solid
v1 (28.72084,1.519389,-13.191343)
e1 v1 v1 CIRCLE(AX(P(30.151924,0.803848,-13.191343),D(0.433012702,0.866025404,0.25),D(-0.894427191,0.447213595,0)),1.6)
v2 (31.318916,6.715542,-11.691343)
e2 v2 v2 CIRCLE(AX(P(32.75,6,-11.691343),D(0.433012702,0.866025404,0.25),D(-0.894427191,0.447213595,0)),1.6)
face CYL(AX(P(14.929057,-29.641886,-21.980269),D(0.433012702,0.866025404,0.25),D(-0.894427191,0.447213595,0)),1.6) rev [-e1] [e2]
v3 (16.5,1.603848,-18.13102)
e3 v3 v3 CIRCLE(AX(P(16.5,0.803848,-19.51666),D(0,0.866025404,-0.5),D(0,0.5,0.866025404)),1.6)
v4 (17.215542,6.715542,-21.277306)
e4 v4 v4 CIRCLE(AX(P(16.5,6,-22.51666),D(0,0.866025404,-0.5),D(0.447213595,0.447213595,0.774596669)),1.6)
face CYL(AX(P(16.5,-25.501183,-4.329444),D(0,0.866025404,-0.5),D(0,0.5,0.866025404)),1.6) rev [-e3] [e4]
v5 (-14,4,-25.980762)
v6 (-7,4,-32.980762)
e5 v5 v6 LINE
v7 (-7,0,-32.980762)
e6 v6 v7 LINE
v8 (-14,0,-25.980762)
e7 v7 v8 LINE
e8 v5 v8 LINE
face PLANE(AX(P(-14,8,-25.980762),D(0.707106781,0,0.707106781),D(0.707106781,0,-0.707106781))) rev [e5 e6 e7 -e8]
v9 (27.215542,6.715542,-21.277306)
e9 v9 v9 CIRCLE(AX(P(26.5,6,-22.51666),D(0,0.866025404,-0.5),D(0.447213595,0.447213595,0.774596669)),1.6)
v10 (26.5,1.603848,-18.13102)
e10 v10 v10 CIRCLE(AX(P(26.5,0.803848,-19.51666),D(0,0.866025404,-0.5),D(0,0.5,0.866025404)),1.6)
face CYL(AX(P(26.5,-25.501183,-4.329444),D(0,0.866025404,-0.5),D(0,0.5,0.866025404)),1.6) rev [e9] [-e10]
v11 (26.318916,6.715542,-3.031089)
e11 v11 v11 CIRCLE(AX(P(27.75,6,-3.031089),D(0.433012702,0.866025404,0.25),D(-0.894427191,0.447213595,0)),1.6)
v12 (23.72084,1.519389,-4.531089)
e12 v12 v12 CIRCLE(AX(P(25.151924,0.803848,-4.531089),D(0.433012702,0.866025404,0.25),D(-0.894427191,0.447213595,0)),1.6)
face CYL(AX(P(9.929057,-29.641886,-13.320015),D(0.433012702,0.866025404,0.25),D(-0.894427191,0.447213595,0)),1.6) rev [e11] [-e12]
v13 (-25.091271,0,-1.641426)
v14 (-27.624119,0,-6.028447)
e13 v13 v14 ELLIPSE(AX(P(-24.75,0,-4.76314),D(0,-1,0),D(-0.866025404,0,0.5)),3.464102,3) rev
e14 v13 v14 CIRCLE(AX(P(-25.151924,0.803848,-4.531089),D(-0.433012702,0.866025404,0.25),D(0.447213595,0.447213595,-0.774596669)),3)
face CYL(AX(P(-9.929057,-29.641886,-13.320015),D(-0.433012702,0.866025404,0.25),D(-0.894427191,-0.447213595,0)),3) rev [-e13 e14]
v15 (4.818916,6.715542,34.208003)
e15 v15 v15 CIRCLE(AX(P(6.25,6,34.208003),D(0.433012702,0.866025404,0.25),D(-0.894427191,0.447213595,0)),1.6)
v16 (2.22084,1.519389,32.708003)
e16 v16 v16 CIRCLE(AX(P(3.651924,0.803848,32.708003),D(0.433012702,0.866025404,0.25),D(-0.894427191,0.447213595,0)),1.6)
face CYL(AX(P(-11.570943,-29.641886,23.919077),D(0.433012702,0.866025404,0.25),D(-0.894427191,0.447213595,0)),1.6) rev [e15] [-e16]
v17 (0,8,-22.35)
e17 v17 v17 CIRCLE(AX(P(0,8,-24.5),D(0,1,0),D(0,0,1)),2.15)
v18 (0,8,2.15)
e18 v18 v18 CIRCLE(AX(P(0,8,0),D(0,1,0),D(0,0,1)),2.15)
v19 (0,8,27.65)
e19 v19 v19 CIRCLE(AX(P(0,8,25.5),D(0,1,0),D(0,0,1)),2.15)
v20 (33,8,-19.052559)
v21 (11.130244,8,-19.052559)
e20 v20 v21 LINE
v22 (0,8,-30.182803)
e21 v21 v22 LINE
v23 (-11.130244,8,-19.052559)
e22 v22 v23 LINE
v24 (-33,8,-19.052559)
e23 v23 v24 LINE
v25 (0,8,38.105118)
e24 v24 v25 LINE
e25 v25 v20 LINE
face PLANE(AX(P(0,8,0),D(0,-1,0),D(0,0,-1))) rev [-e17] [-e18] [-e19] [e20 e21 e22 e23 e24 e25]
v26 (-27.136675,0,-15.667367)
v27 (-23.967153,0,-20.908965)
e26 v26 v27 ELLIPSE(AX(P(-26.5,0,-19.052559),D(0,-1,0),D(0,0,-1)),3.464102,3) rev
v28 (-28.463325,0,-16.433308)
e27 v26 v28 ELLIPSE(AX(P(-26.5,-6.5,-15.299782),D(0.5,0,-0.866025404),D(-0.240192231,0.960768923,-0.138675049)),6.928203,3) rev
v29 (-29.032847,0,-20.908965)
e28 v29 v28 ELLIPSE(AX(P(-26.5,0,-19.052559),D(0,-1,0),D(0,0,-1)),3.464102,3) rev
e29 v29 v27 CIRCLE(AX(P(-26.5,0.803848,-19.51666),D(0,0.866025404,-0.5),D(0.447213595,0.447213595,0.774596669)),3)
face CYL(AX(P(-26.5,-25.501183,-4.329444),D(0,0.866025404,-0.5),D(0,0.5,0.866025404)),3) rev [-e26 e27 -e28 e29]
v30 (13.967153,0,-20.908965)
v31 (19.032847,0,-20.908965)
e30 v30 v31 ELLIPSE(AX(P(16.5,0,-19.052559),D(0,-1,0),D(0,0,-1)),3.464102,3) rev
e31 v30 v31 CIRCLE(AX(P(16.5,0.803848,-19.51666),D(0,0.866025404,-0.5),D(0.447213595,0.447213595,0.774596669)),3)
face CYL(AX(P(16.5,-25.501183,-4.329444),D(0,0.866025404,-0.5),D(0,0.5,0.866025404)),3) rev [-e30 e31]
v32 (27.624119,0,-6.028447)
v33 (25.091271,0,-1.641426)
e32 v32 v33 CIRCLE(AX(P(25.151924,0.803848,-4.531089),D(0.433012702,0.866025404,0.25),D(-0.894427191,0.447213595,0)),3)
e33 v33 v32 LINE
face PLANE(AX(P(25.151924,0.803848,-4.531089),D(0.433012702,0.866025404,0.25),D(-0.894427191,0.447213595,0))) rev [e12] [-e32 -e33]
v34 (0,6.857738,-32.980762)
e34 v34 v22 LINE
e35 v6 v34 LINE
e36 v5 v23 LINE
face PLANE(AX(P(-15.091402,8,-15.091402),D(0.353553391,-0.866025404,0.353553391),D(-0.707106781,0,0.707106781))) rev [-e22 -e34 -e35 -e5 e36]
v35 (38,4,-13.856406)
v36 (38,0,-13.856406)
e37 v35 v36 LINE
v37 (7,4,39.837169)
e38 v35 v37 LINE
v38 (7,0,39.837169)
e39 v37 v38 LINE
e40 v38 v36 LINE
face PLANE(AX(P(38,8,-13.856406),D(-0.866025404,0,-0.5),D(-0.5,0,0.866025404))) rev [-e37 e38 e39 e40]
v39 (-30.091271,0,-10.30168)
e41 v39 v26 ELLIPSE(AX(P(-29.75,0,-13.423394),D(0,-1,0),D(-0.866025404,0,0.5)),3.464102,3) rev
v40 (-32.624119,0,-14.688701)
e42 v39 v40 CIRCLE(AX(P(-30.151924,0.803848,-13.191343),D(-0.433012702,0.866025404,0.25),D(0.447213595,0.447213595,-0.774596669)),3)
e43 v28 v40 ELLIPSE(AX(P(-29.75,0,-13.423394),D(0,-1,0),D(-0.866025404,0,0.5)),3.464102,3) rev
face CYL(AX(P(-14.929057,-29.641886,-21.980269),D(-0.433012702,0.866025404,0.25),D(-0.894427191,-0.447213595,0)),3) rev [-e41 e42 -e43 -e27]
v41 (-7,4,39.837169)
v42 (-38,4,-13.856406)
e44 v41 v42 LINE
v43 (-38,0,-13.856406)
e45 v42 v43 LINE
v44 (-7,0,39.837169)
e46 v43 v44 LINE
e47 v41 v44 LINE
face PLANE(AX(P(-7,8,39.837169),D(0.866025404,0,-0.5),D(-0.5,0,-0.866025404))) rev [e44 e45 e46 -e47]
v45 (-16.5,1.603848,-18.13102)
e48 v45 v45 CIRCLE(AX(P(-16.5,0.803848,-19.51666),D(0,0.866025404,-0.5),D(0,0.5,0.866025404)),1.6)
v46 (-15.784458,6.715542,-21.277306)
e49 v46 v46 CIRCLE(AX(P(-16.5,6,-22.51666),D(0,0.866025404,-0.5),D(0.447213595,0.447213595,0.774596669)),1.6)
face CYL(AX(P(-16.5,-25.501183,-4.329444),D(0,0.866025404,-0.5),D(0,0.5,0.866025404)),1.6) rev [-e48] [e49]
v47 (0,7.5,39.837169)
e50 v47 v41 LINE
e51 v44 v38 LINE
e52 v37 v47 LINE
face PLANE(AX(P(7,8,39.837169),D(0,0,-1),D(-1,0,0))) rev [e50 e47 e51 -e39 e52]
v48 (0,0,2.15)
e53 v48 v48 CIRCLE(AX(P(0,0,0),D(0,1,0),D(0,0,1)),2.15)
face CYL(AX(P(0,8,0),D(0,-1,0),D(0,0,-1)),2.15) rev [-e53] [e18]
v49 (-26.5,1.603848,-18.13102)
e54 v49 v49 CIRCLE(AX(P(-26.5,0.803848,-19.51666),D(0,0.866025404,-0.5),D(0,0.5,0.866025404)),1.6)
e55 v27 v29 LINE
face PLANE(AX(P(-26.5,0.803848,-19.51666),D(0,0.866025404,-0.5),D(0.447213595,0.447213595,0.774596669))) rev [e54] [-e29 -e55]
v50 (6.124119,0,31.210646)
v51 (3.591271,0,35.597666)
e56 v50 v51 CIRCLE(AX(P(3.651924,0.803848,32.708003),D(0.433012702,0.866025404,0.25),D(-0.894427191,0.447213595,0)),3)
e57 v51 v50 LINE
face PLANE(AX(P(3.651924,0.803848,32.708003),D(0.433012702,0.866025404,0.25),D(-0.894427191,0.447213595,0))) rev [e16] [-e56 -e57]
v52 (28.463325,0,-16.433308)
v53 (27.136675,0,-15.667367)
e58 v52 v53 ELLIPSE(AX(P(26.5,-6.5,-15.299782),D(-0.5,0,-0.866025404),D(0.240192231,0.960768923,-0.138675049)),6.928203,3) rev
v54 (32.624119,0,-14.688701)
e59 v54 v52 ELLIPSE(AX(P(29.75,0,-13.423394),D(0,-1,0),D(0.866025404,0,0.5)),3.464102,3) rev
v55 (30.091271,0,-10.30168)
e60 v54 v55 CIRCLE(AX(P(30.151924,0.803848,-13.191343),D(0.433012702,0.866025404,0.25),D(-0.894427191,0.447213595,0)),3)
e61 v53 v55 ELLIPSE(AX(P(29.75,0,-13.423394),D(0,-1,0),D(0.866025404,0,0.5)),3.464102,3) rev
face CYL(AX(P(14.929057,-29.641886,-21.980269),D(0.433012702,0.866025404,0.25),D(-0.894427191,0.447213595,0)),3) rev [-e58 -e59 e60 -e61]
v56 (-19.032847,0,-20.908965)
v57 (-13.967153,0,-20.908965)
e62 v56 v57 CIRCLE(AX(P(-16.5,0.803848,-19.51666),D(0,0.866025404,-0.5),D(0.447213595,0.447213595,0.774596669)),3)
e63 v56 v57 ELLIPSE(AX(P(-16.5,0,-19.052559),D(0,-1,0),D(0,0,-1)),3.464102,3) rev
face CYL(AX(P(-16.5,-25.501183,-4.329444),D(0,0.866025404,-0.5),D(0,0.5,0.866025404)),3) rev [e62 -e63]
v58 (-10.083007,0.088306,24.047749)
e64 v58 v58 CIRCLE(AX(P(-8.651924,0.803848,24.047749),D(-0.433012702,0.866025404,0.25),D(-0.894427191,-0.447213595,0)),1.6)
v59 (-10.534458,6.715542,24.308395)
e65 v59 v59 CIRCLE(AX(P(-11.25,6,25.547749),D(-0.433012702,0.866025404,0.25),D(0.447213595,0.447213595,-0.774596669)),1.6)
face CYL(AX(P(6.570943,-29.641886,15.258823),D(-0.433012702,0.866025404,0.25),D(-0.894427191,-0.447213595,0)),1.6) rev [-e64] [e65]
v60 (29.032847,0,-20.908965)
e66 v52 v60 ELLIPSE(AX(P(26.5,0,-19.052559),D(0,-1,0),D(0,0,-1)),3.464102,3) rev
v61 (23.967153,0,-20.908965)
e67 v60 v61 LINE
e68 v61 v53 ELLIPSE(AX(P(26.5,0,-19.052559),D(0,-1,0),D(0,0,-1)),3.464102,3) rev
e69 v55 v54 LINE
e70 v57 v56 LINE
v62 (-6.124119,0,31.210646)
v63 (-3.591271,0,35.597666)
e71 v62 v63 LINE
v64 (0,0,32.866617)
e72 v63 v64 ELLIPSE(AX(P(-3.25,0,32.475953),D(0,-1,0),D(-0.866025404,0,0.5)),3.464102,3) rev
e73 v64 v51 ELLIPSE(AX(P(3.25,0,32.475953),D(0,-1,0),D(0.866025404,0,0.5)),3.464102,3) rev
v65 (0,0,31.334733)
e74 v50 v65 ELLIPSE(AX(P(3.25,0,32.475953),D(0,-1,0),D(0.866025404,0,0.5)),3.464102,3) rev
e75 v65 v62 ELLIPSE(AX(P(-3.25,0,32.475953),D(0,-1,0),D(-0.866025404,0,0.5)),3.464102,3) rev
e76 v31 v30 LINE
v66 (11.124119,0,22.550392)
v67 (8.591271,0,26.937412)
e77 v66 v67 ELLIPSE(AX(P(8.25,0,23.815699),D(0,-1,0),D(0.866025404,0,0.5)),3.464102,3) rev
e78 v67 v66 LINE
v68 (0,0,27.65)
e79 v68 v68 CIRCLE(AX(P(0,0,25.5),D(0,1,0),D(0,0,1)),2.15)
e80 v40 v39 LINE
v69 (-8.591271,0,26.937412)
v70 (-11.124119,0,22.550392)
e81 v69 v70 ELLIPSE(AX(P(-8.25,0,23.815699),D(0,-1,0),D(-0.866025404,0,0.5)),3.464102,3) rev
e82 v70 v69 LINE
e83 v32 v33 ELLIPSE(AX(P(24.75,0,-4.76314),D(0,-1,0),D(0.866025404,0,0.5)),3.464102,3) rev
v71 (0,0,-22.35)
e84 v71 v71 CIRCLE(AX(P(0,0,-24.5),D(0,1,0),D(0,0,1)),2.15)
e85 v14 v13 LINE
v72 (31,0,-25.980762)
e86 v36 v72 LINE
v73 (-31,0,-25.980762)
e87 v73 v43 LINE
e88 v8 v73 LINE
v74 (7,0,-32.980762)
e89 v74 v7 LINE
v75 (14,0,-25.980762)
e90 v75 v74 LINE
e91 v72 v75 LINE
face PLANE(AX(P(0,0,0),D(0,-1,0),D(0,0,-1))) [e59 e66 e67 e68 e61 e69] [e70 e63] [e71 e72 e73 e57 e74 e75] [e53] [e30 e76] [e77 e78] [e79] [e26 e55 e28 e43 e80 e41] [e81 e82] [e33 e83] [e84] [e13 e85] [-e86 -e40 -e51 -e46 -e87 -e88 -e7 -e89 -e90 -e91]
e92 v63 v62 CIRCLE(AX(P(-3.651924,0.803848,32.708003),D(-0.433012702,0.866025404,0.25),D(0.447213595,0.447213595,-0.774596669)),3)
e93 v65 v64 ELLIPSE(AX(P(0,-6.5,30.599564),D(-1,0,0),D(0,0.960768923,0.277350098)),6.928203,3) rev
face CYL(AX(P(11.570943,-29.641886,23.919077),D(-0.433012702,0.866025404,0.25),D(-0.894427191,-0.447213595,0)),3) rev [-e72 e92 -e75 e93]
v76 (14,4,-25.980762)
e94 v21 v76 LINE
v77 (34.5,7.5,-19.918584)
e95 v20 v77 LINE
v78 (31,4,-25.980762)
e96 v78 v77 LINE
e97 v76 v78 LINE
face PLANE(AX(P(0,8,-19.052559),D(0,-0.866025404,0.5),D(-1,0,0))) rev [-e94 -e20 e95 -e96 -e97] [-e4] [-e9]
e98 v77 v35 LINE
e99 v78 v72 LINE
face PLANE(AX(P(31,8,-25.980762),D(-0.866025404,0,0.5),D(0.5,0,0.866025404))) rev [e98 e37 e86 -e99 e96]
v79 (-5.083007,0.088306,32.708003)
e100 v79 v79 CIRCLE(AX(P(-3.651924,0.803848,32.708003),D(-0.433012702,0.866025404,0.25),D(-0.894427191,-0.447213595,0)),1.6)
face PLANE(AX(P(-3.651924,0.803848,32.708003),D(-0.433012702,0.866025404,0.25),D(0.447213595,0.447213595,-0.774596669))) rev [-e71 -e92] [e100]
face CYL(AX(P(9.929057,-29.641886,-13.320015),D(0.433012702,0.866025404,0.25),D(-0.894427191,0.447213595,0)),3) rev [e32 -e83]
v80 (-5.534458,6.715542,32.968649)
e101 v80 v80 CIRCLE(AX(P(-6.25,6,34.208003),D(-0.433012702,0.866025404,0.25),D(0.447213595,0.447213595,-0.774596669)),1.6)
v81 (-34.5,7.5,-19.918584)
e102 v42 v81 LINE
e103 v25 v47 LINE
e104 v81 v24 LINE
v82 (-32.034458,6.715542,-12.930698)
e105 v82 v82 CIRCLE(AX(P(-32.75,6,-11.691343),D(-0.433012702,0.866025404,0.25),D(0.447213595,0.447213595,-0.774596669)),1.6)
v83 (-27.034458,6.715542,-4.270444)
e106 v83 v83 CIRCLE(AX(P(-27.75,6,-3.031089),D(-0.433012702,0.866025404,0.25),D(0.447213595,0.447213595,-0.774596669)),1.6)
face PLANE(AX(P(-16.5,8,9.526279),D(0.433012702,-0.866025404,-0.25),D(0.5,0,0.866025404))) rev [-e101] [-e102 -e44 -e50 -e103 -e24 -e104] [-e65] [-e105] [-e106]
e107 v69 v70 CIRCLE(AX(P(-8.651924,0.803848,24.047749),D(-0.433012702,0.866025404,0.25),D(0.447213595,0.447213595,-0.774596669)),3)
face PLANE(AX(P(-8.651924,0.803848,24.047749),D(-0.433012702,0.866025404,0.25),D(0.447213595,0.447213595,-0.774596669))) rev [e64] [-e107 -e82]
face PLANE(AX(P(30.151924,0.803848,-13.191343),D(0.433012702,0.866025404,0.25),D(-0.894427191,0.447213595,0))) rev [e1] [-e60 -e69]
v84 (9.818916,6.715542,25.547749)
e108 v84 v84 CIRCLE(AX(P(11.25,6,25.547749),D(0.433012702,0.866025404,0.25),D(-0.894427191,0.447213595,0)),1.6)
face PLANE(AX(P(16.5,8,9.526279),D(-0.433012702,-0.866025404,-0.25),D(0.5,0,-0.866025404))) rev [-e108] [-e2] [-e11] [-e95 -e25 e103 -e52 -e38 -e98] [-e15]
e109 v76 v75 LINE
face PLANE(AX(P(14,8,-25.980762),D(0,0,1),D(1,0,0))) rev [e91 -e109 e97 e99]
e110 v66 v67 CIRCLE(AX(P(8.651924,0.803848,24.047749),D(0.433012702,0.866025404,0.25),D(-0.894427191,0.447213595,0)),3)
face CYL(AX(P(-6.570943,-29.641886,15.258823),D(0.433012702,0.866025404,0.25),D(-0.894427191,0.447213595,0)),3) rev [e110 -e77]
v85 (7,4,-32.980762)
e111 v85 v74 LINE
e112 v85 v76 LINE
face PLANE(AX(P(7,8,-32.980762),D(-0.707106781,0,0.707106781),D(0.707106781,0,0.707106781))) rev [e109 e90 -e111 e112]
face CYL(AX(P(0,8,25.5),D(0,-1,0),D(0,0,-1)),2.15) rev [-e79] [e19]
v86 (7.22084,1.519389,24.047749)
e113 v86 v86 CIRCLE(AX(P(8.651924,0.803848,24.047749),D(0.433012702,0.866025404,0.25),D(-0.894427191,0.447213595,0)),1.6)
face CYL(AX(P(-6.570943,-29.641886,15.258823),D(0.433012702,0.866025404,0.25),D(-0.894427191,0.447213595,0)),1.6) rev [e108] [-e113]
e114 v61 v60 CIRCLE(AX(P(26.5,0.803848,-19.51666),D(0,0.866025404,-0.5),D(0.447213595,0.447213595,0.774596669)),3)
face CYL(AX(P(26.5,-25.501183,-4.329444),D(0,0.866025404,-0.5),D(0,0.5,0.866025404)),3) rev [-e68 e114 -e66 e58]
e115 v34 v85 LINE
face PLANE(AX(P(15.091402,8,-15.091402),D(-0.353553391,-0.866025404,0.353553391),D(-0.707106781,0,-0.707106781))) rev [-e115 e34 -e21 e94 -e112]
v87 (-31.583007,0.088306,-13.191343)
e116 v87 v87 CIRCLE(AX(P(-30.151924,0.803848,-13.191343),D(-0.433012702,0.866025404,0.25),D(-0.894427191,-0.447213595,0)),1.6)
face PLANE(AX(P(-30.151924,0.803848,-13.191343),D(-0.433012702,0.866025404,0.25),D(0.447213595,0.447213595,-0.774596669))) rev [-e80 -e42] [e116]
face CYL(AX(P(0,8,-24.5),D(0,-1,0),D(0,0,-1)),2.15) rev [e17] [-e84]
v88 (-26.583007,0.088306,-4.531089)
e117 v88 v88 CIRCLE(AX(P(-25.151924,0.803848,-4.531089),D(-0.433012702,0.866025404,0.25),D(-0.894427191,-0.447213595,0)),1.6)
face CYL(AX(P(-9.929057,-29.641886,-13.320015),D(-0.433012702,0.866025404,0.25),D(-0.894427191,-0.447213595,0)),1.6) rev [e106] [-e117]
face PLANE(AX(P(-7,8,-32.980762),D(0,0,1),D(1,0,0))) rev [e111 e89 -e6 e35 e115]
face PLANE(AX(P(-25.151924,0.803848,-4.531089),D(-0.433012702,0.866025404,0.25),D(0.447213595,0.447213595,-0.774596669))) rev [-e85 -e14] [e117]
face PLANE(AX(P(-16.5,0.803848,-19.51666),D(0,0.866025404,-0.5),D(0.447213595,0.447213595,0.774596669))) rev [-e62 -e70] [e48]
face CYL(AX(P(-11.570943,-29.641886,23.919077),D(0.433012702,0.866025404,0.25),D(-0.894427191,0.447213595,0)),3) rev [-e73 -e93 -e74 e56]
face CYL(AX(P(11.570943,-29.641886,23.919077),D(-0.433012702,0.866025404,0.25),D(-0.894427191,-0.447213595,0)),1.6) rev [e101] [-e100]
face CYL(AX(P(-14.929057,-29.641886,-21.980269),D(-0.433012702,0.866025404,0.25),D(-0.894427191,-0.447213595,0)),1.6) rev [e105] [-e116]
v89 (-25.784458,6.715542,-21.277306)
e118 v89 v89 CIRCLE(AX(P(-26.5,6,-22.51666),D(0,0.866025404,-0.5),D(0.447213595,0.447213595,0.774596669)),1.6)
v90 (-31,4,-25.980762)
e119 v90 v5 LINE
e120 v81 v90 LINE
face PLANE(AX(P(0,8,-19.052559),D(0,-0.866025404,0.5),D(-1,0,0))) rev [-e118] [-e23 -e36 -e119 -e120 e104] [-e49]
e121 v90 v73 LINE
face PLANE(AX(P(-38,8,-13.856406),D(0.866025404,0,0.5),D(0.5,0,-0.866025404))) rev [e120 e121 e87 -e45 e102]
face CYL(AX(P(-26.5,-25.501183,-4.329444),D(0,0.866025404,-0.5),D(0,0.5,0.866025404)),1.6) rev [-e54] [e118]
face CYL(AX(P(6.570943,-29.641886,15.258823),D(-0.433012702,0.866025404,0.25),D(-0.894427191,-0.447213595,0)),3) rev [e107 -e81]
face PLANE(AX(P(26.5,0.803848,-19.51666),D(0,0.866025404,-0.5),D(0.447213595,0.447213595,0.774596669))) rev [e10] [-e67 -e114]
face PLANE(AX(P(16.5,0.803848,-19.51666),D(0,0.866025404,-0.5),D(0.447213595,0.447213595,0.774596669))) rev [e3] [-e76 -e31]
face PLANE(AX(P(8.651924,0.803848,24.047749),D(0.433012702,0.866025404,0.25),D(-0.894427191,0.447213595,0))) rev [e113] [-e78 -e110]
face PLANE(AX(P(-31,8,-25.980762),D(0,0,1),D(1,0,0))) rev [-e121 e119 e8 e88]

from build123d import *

# Parameters (mm, degrees)
SKETCH1_R           = 2.15
BOSS_EXTRUDE1_DEPTH = 8
CHAMFER1_SIZE       = 4
CHAMFER1_SIZE_2     = 6.92820323
CUT_EXTRUDE1_REACH  = 62.128
SKETCH2_R           = 1.6
CUT_EXTRUDE2_REACH  = 68.128
CUT_EXTRUDE2_START  = -6
SKETCH3_R           = 3
CIRPATTERN1_COUNT   = 3


with BuildPart() as part:
    # Sketch1 → Boss-Extrude1 (new body)
    with BuildSketch(Plane(origin=(0, 0, 0), x_dir=(1, 0, 0), z_dir=(0, 1, 0))):
        Polygon((-31, 25.980762114), (-14, 25.980762114), (-7, 32.980762114), (7, 32.980762114), (14, 25.980762114), (31, 25.980762114), (38, 13.856406461), (7, -39.837168574), (-7, -39.837168574), (-38, 13.856406461), align=None)
        with Locations(Location((0, 24.5, 0), (0, 0, 270))):
            Circle(SKETCH1_R, mode=Mode.SUBTRACT)
        with Locations(Location((0, -25.5, 0), (0, 0, 270))):
            Circle(SKETCH1_R, mode=Mode.SUBTRACT)
        with Locations(Location((0, 0, 0), (0, 0, 270))):
            Circle(SKETCH1_R, mode=Mode.SUBTRACT)
    extrude(amount=BOSS_EXTRUDE1_DEPTH)

    # Chamfer1
    # the kernel refuses this chamfer: 6.92820323, 4 mm, written as the material it takes off along each edge
    with BuildSketch(Plane(origin=(46.961927941, 8, -29.378920988), x_dir=(0.05013755556391488, -0.9983227437537926, 0.028946931201335895), z_dir=(-0.49999999999999767, 0, 0.86602540378444)), Plane(origin=(1.961927941, 8, 55.359683102), x_dir=(-0.05013755556391399, -0.9983227437537926, 0.02894693120133537), z_dir=(-0.49999999999999756, 0, -0.8660254037844402))) as chamfer1_piece_1:
        Polygon((CHAMFER1_SIZE * 0.998322743754, -CHAMFER1_SIZE * 0.0578938624027), (-CHAMFER1_SIZE_2 * 0.057893862405, -CHAMFER1_SIZE_2 * 0.998322743793), (0, 0), align=None)
    extrude(amount=97.847711765, mode=Mode.SUBTRACT)
    with BuildSketch(Plane(origin=(-3.923855882, 8, -25.980762114), x_dir=(0, -0.9983227437537926, -0.05789386240267147), z_dir=(1, 0, 0))) as chamfer1_piece_2_section:
        Polygon((CHAMFER1_SIZE * 0.998322743754, -CHAMFER1_SIZE * 0.0578938624027), (-CHAMFER1_SIZE_2 * 0.057893862405, -CHAMFER1_SIZE_2 * 0.998322743793), (0, 0), align=None)
    chamfer1_piece_2 = extrude(amount=52.847711765, mode=Mode.PRIVATE)
    chamfer1_piece_2 = split(chamfer1_piece_2, bisect_by=Plane(origin=(24.400878633, 6.686948716, -15.57988348), z_dir=(0.7071067811865477, 0, -0.7071067811865475)), keep=Keep.TOP, mode=Mode.PRIVATE)
    add(chamfer1_piece_2, mode=Mode.SUBTRACT)
    with BuildSketch(Plane(origin=(-5.674080039, 8, -45.654842153), x_dir=(0.04093714269400996, -0.9983227437537926, -0.04093714269400995), z_dir=(0.7071067811865475, 0, 0.7071067811865477))) as chamfer1_piece_3_section:
        Polygon((CHAMFER1_SIZE * 0.998322743754, -CHAMFER1_SIZE * 0.0578938624027), (-CHAMFER1_SIZE_2 * 0.057893862405, -CHAMFER1_SIZE_2 * 0.998322743793), (0, 0), align=None)
    chamfer1_piece_3 = extrude(amount=45.747206701, mode=Mode.PRIVATE)
    chamfer1_piece_3 = split(chamfer1_piece_3, bisect_by=Plane(origin=(1.830005366, 6.678491599, -25.980762114), z_dir=(0, 0, -1)), keep=Keep.TOP, mode=Mode.PRIVATE)
    add(chamfer1_piece_3, mode=Mode.SUBTRACT)
    with BuildSketch(Plane(origin=(-26.674080039, 8, -13.306682074), x_dir=(-0.04093714269400995, -0.9983227437537926, -0.04093714269400996), z_dir=(0.7071067811865477, 0, -0.7071067811865474))) as chamfer1_piece_4_section:
        Polygon((CHAMFER1_SIZE * 0.998322743754, -CHAMFER1_SIZE * 0.0578938624027), (-CHAMFER1_SIZE_2 * 0.057893862405, -CHAMFER1_SIZE_2 * 0.998322743793), (0, 0), align=None)
    chamfer1_piece_4 = extrude(amount=45.747206701, mode=Mode.PRIVATE)
    chamfer1_piece_4 = split(chamfer1_piece_4, bisect_by=Plane(origin=(-1.830005366, 6.678491599, -25.980762114), z_dir=(0, 0, -1)), keep=Keep.TOP, mode=Mode.PRIVATE)
    add(chamfer1_piece_4, mode=Mode.SUBTRACT)
    with BuildSketch(Plane(origin=(-48.923855882, 8, -25.980762114), x_dir=(0, -0.9983227437537926, -0.05789386240267147), z_dir=(1, 0, 0))) as chamfer1_piece_5_section:
        Polygon((CHAMFER1_SIZE * 0.998322743754, -CHAMFER1_SIZE * 0.0578938624027), (-CHAMFER1_SIZE_2 * 0.057893862405, -CHAMFER1_SIZE_2 * 0.998322743793), (0, 0), align=None)
    chamfer1_piece_5 = extrude(amount=52.847711765, mode=Mode.PRIVATE)
    chamfer1_piece_5 = split(chamfer1_piece_5, bisect_by=Plane(origin=(-24.400878633, 6.686948716, -15.57988348), z_dir=(-0.7071067811865474, 0, -0.7071067811865477)), keep=Keep.TOP, mode=Mode.PRIVATE)
    add(chamfer1_piece_5, mode=Mode.SUBTRACT)
    with BuildSketch(Plane(origin=(-5.674080039, 8, -45.654842153), x_dir=(0.04093714269400996, -0.9983227437537926, -0.04093714269400995), z_dir=(0.7071067811865475, 0, 0.7071067811865477))) as chamfer1_piece_6a_section:
        Polygon((CHAMFER1_SIZE * 0.998322743754, -CHAMFER1_SIZE * 0.0578938624027), (-CHAMFER1_SIZE_2 * 0.057893862405, -CHAMFER1_SIZE_2 * 0.998322743793), (0, 0), align=None)
    chamfer1_piece_6a = extrude(amount=45.747206701, mode=Mode.PRIVATE)
    chamfer1_piece_6a = split(chamfer1_piece_6a, bisect_by=Plane(origin=(17.706766412, 6.766221652, -25.980762114), z_dir=(0, 0, 1)), keep=Keep.TOP, mode=Mode.PRIVATE)
    with BuildSketch(Plane(origin=(-3.923855882, 8, -25.980762114), x_dir=(0, -0.9983227437537926, -0.05789386240267147), z_dir=(1, 0, 0))) as chamfer1_piece_6b_section:
        Polygon((CHAMFER1_SIZE * 0.998322743754, -CHAMFER1_SIZE * 0.0578938624027), (-CHAMFER1_SIZE_2 * 0.057893862405, -CHAMFER1_SIZE_2 * 0.998322743793), (0, 0), align=None)
    chamfer1_piece_6b = extrude(amount=52.847711765, mode=Mode.PRIVATE)
    chamfer1_piece_6b = split(chamfer1_piece_6b, bisect_by=Plane(origin=(11.378920334, 6.766221652, -28.60184178), z_dir=(-0.7071067811865477, 0, 0.7071067811865475)), keep=Keep.TOP, mode=Mode.PRIVATE)
    chamfer1_piece_6 = chamfer1_piece_6a & chamfer1_piece_6b
    add(chamfer1_piece_6, mode=Mode.SUBTRACT)
    with BuildSketch(Plane(origin=(-48.923855882, 8, -25.980762114), x_dir=(0, -0.9983227437537926, -0.05789386240267147), z_dir=(1, 0, 0))) as chamfer1_piece_7a_section:
        Polygon((CHAMFER1_SIZE * 0.998322743754, -CHAMFER1_SIZE * 0.0578938624027), (-CHAMFER1_SIZE_2 * 0.057893862405, -CHAMFER1_SIZE_2 * 0.998322743793), (0, 0), align=None)
    chamfer1_piece_7a = extrude(amount=52.847711765, mode=Mode.PRIVATE)
    chamfer1_piece_7a = split(chamfer1_piece_7a, bisect_by=Plane(origin=(-11.378920334, 6.766221652, -28.60184178), z_dir=(0.7071067811865474, 0, 0.7071067811865477)), keep=Keep.TOP, mode=Mode.PRIVATE)
    with BuildSketch(Plane(origin=(-26.674080039, 8, -13.306682074), x_dir=(-0.04093714269400995, -0.9983227437537926, -0.04093714269400996), z_dir=(0.7071067811865477, 0, -0.7071067811865474))) as chamfer1_piece_7b_section:
        Polygon((CHAMFER1_SIZE * 0.998322743754, -CHAMFER1_SIZE * 0.0578938624027), (-CHAMFER1_SIZE_2 * 0.057893862405, -CHAMFER1_SIZE_2 * 0.998322743793), (0, 0), align=None)
    chamfer1_piece_7b = extrude(amount=45.747206701, mode=Mode.PRIVATE)
    chamfer1_piece_7b = split(chamfer1_piece_7b, bisect_by=Plane(origin=(-17.706766412, 6.766221652, -25.980762114), z_dir=(0, 0, 1)), keep=Keep.TOP, mode=Mode.PRIVATE)
    chamfer1_piece_7 = chamfer1_piece_7a & chamfer1_piece_7b
    add(chamfer1_piece_7, mode=Mode.SUBTRACT)

    # Cut-Extrude1: up to this plane
    cut_extrude1_end = Plane(origin=(0, 0, 0), z_dir=(0, -1, 0))
    # Sketch2 → Cut-Extrude1 (cut, up to the surface)
    with BuildSketch(Plane(origin=(7.125, 14.25, 4.113620668), x_dir=(0.9013878188659966, -0.41602514716892336, -0.12009611535381544), z_dir=(0.43301270189222085, 0.8660254037844383, 0.24999999999999917)), mode=Mode.PRIVATE) as cut_extrude1_sk1:
        with Locations(Location((28.428385057, 12.896779562, 0), (0, 0, 172.874983651))):
            Circle(SKETCH2_R)
    cut_extrude1_tool1 = split(extrude(cut_extrude1_sk1.sketch, amount=-CUT_EXTRUDE1_REACH, mode=Mode.PRIVATE), bisect_by=cut_extrude1_end, keep=Keep.BOTH, mode=Mode.PRIVATE)
    # Sketch2 → Cut-Extrude1 (cut, up to the surface)
    with BuildSketch(Plane(origin=(7.125, 14.25, 4.113620668), x_dir=(0.9013878188659966, -0.41602514716892336, -0.12009611535381544), z_dir=(0.43301270189222085, 0.8660254037844383, 0.24999999999999917)), mode=Mode.PRIVATE) as cut_extrude1_sk2:
        with Locations(Location((-0.970725343, -31.201886038, 0), (0, 0, 172.874983651))):
            Circle(SKETCH2_R)
    cut_extrude1_tool2 = split(extrude(cut_extrude1_sk2.sketch, amount=-CUT_EXTRUDE1_REACH, mode=Mode.PRIVATE), bisect_by=cut_extrude1_end, keep=Keep.BOTH, mode=Mode.PRIVATE)
    # Sketch2 → Cut-Extrude1 (cut, up to the surface)
    with BuildSketch(Plane(origin=(7.125, 14.25, 4.113620668), x_dir=(0.9013878188659966, -0.41602514716892336, -0.12009611535381544), z_dir=(0.43301270189222085, 0.8660254037844383, 0.24999999999999917)), mode=Mode.PRIVATE) as cut_extrude1_sk3:
        with Locations(Location((4.576276619, -22.881383094, 0), (0, 0, 172.874983651))):
            Circle(SKETCH2_R)
    cut_extrude1_tool3 = split(extrude(cut_extrude1_sk3.sketch, amount=-CUT_EXTRUDE1_REACH, mode=Mode.PRIVATE), bisect_by=cut_extrude1_end, keep=Keep.BOTH, mode=Mode.PRIVATE)
    # Sketch2 → Cut-Extrude1 (cut, up to the surface)
    with BuildSketch(Plane(origin=(7.125, 14.25, 4.113620668), x_dir=(0.9013878188659966, -0.41602514716892336, -0.12009611535381544), z_dir=(0.43301270189222085, 0.8660254037844383, 0.24999999999999917)), mode=Mode.PRIVATE) as cut_extrude1_sk4:
        with Locations(Location((22.881383094, 4.576276619, 0), (0, 0, 172.874983651))):
            Circle(SKETCH2_R)
    cut_extrude1_tool4 = split(extrude(cut_extrude1_sk4.sketch, amount=-CUT_EXTRUDE1_REACH, mode=Mode.PRIVATE), bisect_by=cut_extrude1_end, keep=Keep.BOTH, mode=Mode.PRIVATE)
    cut_extrude1 = cut_extrude1_tool1.solids().sort_by_distance((32.75, 6, -11.691343))[0] + cut_extrude1_tool2.solids().sort_by_distance((6.25, 6, 34.208003))[0] + cut_extrude1_tool3.solids().sort_by_distance((11.25, 6, 25.547749))[0] + cut_extrude1_tool4.solids().sort_by_distance((27.75, 6, -3.031089))[0]
    add(cut_extrude1, mode=Mode.SUBTRACT)

    # Sketch3 → Cut-Extrude2 (cut, up to next)
    with BuildSketch(Plane(origin=(7.125, 14.25, 4.113620668), x_dir=(0.9013878188659967, -0.41602514716892325, -0.12009611535381544), z_dir=(0.43301270189222074, 0.8660254037844383, 0.24999999999999925)).offset(CUT_EXTRUDE2_START), mode=Mode.PRIVATE) as cut_extrude2_sk1:
        with Locations((28.428385057, 12.896779562)):
            Circle(SKETCH3_R)
    cut_extrude2_tool1 = extrude(cut_extrude2_sk1.sketch, amount=-CUT_EXTRUDE2_REACH, mode=Mode.PRIVATE) & part.part
    # Sketch3 → Cut-Extrude2 (cut, up to next)
    with BuildSketch(Plane(origin=(7.125, 14.25, 4.113620668), x_dir=(0.9013878188659967, -0.41602514716892325, -0.12009611535381544), z_dir=(0.43301270189222074, 0.8660254037844383, 0.24999999999999925)).offset(CUT_EXTRUDE2_START), mode=Mode.PRIVATE) as cut_extrude2_sk2:
        with Locations((-0.970725343, -31.201886038)):
            Circle(SKETCH3_R)
    cut_extrude2_tool2 = extrude(cut_extrude2_sk2.sketch, amount=-CUT_EXTRUDE2_REACH, mode=Mode.PRIVATE) & part.part
    # Sketch3 → Cut-Extrude2 (cut, up to next)
    with BuildSketch(Plane(origin=(7.125, 14.25, 4.113620668), x_dir=(0.9013878188659967, -0.41602514716892325, -0.12009611535381544), z_dir=(0.43301270189222074, 0.8660254037844383, 0.24999999999999925)).offset(CUT_EXTRUDE2_START), mode=Mode.PRIVATE) as cut_extrude2_sk3:
        with Locations((22.881383094, 4.576276619)):
            Circle(SKETCH3_R)
    cut_extrude2_tool3 = extrude(cut_extrude2_sk3.sketch, amount=-CUT_EXTRUDE2_REACH, mode=Mode.PRIVATE) & part.part
    # Sketch3 → Cut-Extrude2 (cut, up to next)
    with BuildSketch(Plane(origin=(7.125, 14.25, 4.113620668), x_dir=(0.9013878188659967, -0.41602514716892325, -0.12009611535381544), z_dir=(0.43301270189222074, 0.8660254037844383, 0.24999999999999925)).offset(CUT_EXTRUDE2_START), mode=Mode.PRIVATE) as cut_extrude2_sk4:
        with Locations((4.576276619, -22.881383094)):
            Circle(SKETCH3_R)
    cut_extrude2_tool4 = extrude(cut_extrude2_sk4.sketch, amount=-CUT_EXTRUDE2_REACH, mode=Mode.PRIVATE) & part.part
    cut_extrude2_1 = cut_extrude2_tool1.solids().sort_by_distance((30.151924, 0.803848, -13.191343))[0]
    add(cut_extrude2_1, mode=Mode.SUBTRACT)
    cut_extrude2_2 = cut_extrude2_tool2.solids().sort_by_distance((3.651924, 0.803848, 32.708003))[0]
    add(cut_extrude2_2, mode=Mode.SUBTRACT)
    cut_extrude2_3 = cut_extrude2_tool3.solids().sort_by_distance((25.151924, 0.803848, -4.531089))[0]
    add(cut_extrude2_3, mode=Mode.SUBTRACT)
    cut_extrude2_4 = cut_extrude2_tool4.solids().sort_by_distance((8.651924, 0.803848, 24.047749))[0]
    add(cut_extrude2_4, mode=Mode.SUBTRACT)
    cut_extrude2 = cut_extrude2_1 + cut_extrude2_2 + cut_extrude2_3 + cut_extrude2_4  # Cut-Extrude2 as one shape, for the pattern or mirror that repeats it

    # CirPattern1: Cut-Extrude1, Cut-Extrude2 ×3 about axis
    cirpattern1_axis = Axis((0, 0, 0), (0, 1, 0))
    add([cut_extrude1.rotate(cirpattern1_axis, i * 360 / CIRPATTERN1_COUNT) for i in range(1, CIRPATTERN1_COUNT)], mode=Mode.SUBTRACT)
    add([cut_extrude2.rotate(cirpattern1_axis, i * 360 / CIRPATTERN1_COUNT) for i in range(1, CIRPATTERN1_COUNT)], mode=Mode.SUBTRACT)


solid = part.part
